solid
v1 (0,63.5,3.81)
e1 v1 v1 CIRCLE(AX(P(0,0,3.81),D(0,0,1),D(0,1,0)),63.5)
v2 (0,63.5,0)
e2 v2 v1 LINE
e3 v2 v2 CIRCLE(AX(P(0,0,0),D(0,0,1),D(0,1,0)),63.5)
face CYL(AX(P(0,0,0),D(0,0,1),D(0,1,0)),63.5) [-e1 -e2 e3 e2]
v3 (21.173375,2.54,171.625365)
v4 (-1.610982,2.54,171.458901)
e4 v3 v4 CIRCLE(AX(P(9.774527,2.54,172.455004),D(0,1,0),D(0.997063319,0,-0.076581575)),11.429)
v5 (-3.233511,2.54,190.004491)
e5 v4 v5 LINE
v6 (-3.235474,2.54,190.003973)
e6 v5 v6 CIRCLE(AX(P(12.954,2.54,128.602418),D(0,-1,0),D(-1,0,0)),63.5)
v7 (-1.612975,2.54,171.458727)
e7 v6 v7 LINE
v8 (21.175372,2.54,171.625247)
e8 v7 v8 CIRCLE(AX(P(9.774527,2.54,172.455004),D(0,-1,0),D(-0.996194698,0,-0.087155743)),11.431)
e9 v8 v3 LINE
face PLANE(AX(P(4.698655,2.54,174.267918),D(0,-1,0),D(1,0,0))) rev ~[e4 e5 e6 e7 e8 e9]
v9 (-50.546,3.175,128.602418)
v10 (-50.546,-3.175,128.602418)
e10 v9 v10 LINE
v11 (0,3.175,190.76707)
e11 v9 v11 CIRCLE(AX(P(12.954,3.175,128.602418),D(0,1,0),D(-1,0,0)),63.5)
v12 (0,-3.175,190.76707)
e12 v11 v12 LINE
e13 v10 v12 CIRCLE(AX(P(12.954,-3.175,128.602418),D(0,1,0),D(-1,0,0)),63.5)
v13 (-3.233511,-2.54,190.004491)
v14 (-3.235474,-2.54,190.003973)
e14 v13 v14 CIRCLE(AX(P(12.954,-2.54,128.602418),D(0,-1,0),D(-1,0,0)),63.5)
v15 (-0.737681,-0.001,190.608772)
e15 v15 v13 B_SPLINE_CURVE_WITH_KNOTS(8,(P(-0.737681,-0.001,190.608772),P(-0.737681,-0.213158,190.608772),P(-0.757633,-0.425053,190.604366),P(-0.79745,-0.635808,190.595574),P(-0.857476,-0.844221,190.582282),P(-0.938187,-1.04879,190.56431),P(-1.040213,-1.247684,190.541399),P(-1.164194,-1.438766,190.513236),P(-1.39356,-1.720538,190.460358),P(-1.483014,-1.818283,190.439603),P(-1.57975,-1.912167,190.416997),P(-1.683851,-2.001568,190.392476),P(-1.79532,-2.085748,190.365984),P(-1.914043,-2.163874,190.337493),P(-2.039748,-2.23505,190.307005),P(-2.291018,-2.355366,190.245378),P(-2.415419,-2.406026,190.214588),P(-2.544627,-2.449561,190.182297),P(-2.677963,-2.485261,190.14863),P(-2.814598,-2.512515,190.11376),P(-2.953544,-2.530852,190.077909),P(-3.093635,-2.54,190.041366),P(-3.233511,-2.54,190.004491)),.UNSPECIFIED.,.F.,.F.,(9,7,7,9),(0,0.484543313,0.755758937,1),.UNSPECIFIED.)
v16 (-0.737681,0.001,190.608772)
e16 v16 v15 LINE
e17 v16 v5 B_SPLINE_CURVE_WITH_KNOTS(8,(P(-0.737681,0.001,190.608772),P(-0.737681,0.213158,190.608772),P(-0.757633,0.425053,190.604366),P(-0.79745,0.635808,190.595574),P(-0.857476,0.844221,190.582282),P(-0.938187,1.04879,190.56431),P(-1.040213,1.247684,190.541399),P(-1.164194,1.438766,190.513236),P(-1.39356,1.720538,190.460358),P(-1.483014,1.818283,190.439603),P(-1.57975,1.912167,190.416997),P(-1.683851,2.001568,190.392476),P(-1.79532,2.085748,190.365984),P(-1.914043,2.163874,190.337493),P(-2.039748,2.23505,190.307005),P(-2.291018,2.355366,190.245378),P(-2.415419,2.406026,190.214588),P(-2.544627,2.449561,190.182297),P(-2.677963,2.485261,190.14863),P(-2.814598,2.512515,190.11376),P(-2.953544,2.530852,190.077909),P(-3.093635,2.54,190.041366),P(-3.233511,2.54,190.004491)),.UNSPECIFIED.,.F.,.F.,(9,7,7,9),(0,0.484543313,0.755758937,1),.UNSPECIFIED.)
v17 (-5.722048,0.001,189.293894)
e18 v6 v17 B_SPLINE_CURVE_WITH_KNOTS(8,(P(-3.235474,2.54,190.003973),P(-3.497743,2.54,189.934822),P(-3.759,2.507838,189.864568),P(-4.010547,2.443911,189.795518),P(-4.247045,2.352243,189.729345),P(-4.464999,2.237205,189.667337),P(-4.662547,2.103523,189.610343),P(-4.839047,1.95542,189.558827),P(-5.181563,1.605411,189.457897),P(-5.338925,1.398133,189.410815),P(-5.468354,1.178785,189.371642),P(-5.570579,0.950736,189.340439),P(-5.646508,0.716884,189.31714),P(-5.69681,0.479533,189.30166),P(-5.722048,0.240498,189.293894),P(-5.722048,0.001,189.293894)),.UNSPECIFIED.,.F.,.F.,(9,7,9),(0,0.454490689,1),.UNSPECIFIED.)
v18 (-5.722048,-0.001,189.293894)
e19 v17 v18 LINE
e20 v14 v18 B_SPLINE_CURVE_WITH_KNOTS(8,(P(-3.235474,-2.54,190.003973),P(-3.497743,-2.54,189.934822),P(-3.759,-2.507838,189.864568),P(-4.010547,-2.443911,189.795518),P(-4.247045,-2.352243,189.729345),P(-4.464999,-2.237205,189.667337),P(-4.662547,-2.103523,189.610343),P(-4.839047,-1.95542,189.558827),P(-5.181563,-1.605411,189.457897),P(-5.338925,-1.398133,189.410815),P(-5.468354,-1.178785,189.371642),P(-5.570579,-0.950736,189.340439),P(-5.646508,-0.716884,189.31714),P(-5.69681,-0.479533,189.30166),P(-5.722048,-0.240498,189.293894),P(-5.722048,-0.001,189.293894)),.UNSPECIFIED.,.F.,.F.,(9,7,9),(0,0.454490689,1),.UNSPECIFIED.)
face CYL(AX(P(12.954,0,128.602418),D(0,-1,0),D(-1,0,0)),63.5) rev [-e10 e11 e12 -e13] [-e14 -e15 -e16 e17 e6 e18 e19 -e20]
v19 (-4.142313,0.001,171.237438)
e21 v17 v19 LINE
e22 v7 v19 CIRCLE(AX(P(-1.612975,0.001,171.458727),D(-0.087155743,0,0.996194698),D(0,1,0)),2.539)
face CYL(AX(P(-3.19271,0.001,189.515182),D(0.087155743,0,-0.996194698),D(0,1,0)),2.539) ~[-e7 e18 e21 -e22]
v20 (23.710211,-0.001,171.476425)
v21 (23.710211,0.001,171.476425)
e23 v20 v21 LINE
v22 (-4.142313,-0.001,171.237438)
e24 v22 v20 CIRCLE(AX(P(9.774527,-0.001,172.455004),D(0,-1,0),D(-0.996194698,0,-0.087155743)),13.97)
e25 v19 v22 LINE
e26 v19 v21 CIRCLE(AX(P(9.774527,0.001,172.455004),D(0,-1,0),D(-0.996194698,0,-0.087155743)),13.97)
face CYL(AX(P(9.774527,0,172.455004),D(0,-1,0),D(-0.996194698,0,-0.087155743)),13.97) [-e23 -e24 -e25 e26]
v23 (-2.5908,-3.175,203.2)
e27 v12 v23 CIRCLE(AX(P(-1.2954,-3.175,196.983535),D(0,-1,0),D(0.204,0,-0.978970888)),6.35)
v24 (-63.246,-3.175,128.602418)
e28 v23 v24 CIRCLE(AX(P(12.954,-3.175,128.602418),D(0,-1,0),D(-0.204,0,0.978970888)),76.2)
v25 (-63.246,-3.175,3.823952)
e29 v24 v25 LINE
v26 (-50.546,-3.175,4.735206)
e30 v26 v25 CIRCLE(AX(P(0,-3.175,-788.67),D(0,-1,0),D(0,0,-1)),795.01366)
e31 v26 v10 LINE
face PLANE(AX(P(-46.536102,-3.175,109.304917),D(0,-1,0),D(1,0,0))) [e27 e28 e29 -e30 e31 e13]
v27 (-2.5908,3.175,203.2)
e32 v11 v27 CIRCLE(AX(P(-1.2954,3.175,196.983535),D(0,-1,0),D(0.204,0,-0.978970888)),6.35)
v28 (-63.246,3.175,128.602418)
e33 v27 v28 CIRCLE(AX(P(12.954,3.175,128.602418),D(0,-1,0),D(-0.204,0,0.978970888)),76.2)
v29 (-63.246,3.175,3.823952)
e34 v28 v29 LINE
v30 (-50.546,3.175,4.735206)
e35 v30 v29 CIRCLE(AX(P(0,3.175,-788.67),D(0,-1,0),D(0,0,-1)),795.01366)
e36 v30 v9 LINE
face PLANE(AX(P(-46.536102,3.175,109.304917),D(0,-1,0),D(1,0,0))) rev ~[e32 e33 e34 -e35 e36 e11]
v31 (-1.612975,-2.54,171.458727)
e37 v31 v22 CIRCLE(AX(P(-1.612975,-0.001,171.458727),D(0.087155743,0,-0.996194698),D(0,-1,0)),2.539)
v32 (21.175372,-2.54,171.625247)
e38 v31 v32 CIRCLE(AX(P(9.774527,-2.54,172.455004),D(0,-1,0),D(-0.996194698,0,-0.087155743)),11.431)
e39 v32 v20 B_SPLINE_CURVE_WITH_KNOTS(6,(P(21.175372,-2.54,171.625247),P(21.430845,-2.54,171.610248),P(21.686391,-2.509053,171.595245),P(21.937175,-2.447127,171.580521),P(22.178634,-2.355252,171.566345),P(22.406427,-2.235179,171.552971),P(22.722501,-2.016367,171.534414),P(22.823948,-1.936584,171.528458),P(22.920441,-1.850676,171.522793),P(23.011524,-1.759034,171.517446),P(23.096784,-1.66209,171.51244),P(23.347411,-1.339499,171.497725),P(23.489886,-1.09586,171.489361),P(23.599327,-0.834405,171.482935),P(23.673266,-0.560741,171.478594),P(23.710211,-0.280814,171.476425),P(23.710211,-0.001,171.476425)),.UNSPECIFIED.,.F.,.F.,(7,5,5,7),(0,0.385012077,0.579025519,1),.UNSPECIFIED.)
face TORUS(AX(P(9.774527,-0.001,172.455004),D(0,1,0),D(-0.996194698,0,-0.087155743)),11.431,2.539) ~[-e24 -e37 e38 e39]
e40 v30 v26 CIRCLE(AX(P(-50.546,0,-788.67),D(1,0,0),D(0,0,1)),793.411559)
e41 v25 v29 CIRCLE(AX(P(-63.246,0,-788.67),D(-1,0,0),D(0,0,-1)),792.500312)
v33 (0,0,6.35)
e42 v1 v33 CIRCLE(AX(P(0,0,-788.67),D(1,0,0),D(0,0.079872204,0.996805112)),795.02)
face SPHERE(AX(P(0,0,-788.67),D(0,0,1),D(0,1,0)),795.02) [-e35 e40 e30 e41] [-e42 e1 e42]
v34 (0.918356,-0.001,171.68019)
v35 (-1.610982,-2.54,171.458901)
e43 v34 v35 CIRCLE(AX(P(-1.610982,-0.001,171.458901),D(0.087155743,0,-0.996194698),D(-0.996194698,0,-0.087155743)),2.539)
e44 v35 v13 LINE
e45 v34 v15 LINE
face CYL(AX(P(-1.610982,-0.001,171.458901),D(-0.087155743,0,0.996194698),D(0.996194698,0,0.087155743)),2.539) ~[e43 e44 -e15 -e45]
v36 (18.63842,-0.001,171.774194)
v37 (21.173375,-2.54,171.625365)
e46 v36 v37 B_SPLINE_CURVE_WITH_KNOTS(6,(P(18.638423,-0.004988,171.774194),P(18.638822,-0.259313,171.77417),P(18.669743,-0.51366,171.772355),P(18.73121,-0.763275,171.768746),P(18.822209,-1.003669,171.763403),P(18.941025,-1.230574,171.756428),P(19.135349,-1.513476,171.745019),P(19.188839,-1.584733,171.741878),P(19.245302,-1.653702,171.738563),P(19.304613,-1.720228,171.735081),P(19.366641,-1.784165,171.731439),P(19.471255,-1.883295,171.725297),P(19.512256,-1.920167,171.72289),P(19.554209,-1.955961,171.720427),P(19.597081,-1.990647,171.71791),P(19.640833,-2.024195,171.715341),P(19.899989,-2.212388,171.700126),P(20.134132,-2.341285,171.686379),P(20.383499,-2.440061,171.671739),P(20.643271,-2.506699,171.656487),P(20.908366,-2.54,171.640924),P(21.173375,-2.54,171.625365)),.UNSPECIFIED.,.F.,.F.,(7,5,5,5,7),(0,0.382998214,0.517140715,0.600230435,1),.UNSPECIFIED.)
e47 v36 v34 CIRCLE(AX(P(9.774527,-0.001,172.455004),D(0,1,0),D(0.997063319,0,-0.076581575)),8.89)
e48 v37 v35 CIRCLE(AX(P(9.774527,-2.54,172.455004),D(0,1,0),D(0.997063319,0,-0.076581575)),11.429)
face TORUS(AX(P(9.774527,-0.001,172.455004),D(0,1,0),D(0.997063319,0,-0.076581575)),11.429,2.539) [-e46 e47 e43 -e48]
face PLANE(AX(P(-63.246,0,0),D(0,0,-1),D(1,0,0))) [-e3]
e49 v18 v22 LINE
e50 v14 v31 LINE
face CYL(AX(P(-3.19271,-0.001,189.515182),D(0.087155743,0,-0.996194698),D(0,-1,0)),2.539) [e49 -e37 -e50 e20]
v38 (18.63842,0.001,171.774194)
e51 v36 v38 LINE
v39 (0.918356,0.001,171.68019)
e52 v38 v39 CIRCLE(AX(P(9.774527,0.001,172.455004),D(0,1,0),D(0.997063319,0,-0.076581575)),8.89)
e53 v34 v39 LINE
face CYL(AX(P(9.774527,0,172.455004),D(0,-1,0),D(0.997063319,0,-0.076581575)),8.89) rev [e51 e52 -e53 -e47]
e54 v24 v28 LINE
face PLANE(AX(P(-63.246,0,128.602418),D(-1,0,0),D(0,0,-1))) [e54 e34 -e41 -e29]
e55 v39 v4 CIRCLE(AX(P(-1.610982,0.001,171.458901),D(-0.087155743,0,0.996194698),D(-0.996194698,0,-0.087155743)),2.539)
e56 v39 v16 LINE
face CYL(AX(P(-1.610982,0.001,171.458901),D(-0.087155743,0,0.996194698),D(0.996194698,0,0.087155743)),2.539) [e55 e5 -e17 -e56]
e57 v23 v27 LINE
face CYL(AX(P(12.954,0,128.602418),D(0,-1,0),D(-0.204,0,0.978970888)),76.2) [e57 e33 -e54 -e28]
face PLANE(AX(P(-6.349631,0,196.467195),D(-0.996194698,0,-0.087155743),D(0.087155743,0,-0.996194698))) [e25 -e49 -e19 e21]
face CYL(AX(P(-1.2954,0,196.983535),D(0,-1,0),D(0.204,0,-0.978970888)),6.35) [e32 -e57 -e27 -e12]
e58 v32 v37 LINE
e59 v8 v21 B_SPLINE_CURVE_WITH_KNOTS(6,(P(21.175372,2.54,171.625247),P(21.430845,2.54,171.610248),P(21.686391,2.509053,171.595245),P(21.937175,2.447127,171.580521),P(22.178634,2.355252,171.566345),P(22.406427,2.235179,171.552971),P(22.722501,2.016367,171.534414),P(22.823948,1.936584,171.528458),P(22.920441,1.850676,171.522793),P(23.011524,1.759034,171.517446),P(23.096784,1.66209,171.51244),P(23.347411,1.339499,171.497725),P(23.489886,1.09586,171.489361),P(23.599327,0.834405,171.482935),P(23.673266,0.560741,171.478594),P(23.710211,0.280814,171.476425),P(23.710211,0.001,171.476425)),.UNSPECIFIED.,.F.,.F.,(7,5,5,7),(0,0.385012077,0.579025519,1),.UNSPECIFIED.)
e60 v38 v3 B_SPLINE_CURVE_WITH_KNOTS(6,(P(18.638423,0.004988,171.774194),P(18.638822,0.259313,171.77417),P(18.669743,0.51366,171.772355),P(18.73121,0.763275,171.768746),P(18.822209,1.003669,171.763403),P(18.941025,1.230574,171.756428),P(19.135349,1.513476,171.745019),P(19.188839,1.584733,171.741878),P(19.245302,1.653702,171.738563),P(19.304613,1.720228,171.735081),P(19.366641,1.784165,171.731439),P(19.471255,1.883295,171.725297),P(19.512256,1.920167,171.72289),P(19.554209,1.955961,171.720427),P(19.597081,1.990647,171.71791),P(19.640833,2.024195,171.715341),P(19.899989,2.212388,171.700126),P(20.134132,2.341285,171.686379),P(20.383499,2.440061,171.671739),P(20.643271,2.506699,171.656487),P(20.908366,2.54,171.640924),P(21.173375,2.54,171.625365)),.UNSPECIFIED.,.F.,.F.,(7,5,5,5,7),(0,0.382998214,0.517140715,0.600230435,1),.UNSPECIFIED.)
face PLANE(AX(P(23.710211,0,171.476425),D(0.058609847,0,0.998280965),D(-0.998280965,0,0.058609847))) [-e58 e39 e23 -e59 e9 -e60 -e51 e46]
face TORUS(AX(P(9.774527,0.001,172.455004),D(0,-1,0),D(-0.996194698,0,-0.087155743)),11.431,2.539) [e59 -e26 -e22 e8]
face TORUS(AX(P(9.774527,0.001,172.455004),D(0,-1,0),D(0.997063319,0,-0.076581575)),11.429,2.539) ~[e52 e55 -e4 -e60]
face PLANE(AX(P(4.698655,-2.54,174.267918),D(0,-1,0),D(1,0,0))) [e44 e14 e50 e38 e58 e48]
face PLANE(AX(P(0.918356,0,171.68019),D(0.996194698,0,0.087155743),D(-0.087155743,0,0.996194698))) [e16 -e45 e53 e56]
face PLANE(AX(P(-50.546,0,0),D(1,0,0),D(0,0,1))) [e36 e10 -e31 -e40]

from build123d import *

# Parameters (mm, degrees)
F3_DEPTH = 3.175
F5_DEPTH = 2.54
F6_R     = 2.539


# Not quite as in the source:
# - a fillet or chamfer is up to 0.001 mm smaller than in the source, because OpenCascade refuses the exact size


with BuildPart() as f1:
    # F0 (on Right) → F1 (revolve)
    with BuildSketch(Plane.YZ):
        with BuildLine():
            Line((0, 6.35), (0, 0))
            Line((0, 0), (63.5, 0))
            Line((63.5, 0), (63.5, 3.81))
            ThreePointArc((63.5, 3.81), (31.7753898481, 5.714746203), (0, 6.35))
        make_face()
    revolve(axis=Axis((0, 0, 3.175), (0, 0, 1)))

    # F2 (on Front) → F3 (join, symmetric)
    with BuildSketch(Plane.XZ):
        with BuildLine():
            Line((-63.246, 0), (-50.546, 0))
            Line((-50.546, 0), (-50.546, 128.6024183169))
            ThreePointArc((-50.546, 128.6024183169), (-36.3147984428, 168.6628164677), (0, 190.7670697195))
            ThreePointArc((0, 190.7670697195), (4.9210651403, 198.2789348597), (-2.5908, 203.2))
            ThreePointArc((-2.5908, 203.2), (-46.1685581314, 176.6748960979), (-63.246, 128.6024183169))
            Line((-63.246, 128.6024183169), (-63.246, 0))
        make_face()
    extrude(amount=F3_DEPTH, both=True)

    # F4 (on Front) → F5 (join, symmetric)
    with BuildSketch(Plane.XZ):
        with BuildLine():
            Line((0.9183558658, 171.6801895282), (-1.2954, 196.9835348597))
            Line((-1.2954, 196.9835348597), (-6.3496308803, 196.4671948838))
            Line((-6.3496308803, 196.4671948838), (-4.1423132005, 171.2374383551))
            ThreePointArc((-4.1423132005, 171.2374383551), (9.8943909909, 158.4855183155), (23.7102105401, 171.4764251136))
            Line((23.7102105401, 171.4764251136), (18.6384196387, 171.7741938758))
            ThreePointArc((18.6384196387, 171.7741938758), (9.8216872219, 163.5651291728), (0.9183558658, 171.6801895282))
        make_face()
    extrude(amount=F5_DEPTH, both=True)

    # F6 (radius 2.54 in the source; OpenCascade refuses exactly that, so slightly less here)
    f6_edges = [f1.edges().sort_by_distance(p)[0] for p in [
        (0.090338, -2.54, 181.144481),
        (0.090338, 2.54, 181.144481),
        (9.821687, -2.54, 163.565129),
        (9.894391, -2.54, 158.485518),
        (-4.932181, -2.54, 180.265666),
        (9.894391, 2.54, 158.485518),
        (-4.932181, 2.54, 180.265666),
        (9.821687, 2.54, 163.565129),
    ]]
    fillet(f6_edges, radius=F6_R)


solid = f1.part
